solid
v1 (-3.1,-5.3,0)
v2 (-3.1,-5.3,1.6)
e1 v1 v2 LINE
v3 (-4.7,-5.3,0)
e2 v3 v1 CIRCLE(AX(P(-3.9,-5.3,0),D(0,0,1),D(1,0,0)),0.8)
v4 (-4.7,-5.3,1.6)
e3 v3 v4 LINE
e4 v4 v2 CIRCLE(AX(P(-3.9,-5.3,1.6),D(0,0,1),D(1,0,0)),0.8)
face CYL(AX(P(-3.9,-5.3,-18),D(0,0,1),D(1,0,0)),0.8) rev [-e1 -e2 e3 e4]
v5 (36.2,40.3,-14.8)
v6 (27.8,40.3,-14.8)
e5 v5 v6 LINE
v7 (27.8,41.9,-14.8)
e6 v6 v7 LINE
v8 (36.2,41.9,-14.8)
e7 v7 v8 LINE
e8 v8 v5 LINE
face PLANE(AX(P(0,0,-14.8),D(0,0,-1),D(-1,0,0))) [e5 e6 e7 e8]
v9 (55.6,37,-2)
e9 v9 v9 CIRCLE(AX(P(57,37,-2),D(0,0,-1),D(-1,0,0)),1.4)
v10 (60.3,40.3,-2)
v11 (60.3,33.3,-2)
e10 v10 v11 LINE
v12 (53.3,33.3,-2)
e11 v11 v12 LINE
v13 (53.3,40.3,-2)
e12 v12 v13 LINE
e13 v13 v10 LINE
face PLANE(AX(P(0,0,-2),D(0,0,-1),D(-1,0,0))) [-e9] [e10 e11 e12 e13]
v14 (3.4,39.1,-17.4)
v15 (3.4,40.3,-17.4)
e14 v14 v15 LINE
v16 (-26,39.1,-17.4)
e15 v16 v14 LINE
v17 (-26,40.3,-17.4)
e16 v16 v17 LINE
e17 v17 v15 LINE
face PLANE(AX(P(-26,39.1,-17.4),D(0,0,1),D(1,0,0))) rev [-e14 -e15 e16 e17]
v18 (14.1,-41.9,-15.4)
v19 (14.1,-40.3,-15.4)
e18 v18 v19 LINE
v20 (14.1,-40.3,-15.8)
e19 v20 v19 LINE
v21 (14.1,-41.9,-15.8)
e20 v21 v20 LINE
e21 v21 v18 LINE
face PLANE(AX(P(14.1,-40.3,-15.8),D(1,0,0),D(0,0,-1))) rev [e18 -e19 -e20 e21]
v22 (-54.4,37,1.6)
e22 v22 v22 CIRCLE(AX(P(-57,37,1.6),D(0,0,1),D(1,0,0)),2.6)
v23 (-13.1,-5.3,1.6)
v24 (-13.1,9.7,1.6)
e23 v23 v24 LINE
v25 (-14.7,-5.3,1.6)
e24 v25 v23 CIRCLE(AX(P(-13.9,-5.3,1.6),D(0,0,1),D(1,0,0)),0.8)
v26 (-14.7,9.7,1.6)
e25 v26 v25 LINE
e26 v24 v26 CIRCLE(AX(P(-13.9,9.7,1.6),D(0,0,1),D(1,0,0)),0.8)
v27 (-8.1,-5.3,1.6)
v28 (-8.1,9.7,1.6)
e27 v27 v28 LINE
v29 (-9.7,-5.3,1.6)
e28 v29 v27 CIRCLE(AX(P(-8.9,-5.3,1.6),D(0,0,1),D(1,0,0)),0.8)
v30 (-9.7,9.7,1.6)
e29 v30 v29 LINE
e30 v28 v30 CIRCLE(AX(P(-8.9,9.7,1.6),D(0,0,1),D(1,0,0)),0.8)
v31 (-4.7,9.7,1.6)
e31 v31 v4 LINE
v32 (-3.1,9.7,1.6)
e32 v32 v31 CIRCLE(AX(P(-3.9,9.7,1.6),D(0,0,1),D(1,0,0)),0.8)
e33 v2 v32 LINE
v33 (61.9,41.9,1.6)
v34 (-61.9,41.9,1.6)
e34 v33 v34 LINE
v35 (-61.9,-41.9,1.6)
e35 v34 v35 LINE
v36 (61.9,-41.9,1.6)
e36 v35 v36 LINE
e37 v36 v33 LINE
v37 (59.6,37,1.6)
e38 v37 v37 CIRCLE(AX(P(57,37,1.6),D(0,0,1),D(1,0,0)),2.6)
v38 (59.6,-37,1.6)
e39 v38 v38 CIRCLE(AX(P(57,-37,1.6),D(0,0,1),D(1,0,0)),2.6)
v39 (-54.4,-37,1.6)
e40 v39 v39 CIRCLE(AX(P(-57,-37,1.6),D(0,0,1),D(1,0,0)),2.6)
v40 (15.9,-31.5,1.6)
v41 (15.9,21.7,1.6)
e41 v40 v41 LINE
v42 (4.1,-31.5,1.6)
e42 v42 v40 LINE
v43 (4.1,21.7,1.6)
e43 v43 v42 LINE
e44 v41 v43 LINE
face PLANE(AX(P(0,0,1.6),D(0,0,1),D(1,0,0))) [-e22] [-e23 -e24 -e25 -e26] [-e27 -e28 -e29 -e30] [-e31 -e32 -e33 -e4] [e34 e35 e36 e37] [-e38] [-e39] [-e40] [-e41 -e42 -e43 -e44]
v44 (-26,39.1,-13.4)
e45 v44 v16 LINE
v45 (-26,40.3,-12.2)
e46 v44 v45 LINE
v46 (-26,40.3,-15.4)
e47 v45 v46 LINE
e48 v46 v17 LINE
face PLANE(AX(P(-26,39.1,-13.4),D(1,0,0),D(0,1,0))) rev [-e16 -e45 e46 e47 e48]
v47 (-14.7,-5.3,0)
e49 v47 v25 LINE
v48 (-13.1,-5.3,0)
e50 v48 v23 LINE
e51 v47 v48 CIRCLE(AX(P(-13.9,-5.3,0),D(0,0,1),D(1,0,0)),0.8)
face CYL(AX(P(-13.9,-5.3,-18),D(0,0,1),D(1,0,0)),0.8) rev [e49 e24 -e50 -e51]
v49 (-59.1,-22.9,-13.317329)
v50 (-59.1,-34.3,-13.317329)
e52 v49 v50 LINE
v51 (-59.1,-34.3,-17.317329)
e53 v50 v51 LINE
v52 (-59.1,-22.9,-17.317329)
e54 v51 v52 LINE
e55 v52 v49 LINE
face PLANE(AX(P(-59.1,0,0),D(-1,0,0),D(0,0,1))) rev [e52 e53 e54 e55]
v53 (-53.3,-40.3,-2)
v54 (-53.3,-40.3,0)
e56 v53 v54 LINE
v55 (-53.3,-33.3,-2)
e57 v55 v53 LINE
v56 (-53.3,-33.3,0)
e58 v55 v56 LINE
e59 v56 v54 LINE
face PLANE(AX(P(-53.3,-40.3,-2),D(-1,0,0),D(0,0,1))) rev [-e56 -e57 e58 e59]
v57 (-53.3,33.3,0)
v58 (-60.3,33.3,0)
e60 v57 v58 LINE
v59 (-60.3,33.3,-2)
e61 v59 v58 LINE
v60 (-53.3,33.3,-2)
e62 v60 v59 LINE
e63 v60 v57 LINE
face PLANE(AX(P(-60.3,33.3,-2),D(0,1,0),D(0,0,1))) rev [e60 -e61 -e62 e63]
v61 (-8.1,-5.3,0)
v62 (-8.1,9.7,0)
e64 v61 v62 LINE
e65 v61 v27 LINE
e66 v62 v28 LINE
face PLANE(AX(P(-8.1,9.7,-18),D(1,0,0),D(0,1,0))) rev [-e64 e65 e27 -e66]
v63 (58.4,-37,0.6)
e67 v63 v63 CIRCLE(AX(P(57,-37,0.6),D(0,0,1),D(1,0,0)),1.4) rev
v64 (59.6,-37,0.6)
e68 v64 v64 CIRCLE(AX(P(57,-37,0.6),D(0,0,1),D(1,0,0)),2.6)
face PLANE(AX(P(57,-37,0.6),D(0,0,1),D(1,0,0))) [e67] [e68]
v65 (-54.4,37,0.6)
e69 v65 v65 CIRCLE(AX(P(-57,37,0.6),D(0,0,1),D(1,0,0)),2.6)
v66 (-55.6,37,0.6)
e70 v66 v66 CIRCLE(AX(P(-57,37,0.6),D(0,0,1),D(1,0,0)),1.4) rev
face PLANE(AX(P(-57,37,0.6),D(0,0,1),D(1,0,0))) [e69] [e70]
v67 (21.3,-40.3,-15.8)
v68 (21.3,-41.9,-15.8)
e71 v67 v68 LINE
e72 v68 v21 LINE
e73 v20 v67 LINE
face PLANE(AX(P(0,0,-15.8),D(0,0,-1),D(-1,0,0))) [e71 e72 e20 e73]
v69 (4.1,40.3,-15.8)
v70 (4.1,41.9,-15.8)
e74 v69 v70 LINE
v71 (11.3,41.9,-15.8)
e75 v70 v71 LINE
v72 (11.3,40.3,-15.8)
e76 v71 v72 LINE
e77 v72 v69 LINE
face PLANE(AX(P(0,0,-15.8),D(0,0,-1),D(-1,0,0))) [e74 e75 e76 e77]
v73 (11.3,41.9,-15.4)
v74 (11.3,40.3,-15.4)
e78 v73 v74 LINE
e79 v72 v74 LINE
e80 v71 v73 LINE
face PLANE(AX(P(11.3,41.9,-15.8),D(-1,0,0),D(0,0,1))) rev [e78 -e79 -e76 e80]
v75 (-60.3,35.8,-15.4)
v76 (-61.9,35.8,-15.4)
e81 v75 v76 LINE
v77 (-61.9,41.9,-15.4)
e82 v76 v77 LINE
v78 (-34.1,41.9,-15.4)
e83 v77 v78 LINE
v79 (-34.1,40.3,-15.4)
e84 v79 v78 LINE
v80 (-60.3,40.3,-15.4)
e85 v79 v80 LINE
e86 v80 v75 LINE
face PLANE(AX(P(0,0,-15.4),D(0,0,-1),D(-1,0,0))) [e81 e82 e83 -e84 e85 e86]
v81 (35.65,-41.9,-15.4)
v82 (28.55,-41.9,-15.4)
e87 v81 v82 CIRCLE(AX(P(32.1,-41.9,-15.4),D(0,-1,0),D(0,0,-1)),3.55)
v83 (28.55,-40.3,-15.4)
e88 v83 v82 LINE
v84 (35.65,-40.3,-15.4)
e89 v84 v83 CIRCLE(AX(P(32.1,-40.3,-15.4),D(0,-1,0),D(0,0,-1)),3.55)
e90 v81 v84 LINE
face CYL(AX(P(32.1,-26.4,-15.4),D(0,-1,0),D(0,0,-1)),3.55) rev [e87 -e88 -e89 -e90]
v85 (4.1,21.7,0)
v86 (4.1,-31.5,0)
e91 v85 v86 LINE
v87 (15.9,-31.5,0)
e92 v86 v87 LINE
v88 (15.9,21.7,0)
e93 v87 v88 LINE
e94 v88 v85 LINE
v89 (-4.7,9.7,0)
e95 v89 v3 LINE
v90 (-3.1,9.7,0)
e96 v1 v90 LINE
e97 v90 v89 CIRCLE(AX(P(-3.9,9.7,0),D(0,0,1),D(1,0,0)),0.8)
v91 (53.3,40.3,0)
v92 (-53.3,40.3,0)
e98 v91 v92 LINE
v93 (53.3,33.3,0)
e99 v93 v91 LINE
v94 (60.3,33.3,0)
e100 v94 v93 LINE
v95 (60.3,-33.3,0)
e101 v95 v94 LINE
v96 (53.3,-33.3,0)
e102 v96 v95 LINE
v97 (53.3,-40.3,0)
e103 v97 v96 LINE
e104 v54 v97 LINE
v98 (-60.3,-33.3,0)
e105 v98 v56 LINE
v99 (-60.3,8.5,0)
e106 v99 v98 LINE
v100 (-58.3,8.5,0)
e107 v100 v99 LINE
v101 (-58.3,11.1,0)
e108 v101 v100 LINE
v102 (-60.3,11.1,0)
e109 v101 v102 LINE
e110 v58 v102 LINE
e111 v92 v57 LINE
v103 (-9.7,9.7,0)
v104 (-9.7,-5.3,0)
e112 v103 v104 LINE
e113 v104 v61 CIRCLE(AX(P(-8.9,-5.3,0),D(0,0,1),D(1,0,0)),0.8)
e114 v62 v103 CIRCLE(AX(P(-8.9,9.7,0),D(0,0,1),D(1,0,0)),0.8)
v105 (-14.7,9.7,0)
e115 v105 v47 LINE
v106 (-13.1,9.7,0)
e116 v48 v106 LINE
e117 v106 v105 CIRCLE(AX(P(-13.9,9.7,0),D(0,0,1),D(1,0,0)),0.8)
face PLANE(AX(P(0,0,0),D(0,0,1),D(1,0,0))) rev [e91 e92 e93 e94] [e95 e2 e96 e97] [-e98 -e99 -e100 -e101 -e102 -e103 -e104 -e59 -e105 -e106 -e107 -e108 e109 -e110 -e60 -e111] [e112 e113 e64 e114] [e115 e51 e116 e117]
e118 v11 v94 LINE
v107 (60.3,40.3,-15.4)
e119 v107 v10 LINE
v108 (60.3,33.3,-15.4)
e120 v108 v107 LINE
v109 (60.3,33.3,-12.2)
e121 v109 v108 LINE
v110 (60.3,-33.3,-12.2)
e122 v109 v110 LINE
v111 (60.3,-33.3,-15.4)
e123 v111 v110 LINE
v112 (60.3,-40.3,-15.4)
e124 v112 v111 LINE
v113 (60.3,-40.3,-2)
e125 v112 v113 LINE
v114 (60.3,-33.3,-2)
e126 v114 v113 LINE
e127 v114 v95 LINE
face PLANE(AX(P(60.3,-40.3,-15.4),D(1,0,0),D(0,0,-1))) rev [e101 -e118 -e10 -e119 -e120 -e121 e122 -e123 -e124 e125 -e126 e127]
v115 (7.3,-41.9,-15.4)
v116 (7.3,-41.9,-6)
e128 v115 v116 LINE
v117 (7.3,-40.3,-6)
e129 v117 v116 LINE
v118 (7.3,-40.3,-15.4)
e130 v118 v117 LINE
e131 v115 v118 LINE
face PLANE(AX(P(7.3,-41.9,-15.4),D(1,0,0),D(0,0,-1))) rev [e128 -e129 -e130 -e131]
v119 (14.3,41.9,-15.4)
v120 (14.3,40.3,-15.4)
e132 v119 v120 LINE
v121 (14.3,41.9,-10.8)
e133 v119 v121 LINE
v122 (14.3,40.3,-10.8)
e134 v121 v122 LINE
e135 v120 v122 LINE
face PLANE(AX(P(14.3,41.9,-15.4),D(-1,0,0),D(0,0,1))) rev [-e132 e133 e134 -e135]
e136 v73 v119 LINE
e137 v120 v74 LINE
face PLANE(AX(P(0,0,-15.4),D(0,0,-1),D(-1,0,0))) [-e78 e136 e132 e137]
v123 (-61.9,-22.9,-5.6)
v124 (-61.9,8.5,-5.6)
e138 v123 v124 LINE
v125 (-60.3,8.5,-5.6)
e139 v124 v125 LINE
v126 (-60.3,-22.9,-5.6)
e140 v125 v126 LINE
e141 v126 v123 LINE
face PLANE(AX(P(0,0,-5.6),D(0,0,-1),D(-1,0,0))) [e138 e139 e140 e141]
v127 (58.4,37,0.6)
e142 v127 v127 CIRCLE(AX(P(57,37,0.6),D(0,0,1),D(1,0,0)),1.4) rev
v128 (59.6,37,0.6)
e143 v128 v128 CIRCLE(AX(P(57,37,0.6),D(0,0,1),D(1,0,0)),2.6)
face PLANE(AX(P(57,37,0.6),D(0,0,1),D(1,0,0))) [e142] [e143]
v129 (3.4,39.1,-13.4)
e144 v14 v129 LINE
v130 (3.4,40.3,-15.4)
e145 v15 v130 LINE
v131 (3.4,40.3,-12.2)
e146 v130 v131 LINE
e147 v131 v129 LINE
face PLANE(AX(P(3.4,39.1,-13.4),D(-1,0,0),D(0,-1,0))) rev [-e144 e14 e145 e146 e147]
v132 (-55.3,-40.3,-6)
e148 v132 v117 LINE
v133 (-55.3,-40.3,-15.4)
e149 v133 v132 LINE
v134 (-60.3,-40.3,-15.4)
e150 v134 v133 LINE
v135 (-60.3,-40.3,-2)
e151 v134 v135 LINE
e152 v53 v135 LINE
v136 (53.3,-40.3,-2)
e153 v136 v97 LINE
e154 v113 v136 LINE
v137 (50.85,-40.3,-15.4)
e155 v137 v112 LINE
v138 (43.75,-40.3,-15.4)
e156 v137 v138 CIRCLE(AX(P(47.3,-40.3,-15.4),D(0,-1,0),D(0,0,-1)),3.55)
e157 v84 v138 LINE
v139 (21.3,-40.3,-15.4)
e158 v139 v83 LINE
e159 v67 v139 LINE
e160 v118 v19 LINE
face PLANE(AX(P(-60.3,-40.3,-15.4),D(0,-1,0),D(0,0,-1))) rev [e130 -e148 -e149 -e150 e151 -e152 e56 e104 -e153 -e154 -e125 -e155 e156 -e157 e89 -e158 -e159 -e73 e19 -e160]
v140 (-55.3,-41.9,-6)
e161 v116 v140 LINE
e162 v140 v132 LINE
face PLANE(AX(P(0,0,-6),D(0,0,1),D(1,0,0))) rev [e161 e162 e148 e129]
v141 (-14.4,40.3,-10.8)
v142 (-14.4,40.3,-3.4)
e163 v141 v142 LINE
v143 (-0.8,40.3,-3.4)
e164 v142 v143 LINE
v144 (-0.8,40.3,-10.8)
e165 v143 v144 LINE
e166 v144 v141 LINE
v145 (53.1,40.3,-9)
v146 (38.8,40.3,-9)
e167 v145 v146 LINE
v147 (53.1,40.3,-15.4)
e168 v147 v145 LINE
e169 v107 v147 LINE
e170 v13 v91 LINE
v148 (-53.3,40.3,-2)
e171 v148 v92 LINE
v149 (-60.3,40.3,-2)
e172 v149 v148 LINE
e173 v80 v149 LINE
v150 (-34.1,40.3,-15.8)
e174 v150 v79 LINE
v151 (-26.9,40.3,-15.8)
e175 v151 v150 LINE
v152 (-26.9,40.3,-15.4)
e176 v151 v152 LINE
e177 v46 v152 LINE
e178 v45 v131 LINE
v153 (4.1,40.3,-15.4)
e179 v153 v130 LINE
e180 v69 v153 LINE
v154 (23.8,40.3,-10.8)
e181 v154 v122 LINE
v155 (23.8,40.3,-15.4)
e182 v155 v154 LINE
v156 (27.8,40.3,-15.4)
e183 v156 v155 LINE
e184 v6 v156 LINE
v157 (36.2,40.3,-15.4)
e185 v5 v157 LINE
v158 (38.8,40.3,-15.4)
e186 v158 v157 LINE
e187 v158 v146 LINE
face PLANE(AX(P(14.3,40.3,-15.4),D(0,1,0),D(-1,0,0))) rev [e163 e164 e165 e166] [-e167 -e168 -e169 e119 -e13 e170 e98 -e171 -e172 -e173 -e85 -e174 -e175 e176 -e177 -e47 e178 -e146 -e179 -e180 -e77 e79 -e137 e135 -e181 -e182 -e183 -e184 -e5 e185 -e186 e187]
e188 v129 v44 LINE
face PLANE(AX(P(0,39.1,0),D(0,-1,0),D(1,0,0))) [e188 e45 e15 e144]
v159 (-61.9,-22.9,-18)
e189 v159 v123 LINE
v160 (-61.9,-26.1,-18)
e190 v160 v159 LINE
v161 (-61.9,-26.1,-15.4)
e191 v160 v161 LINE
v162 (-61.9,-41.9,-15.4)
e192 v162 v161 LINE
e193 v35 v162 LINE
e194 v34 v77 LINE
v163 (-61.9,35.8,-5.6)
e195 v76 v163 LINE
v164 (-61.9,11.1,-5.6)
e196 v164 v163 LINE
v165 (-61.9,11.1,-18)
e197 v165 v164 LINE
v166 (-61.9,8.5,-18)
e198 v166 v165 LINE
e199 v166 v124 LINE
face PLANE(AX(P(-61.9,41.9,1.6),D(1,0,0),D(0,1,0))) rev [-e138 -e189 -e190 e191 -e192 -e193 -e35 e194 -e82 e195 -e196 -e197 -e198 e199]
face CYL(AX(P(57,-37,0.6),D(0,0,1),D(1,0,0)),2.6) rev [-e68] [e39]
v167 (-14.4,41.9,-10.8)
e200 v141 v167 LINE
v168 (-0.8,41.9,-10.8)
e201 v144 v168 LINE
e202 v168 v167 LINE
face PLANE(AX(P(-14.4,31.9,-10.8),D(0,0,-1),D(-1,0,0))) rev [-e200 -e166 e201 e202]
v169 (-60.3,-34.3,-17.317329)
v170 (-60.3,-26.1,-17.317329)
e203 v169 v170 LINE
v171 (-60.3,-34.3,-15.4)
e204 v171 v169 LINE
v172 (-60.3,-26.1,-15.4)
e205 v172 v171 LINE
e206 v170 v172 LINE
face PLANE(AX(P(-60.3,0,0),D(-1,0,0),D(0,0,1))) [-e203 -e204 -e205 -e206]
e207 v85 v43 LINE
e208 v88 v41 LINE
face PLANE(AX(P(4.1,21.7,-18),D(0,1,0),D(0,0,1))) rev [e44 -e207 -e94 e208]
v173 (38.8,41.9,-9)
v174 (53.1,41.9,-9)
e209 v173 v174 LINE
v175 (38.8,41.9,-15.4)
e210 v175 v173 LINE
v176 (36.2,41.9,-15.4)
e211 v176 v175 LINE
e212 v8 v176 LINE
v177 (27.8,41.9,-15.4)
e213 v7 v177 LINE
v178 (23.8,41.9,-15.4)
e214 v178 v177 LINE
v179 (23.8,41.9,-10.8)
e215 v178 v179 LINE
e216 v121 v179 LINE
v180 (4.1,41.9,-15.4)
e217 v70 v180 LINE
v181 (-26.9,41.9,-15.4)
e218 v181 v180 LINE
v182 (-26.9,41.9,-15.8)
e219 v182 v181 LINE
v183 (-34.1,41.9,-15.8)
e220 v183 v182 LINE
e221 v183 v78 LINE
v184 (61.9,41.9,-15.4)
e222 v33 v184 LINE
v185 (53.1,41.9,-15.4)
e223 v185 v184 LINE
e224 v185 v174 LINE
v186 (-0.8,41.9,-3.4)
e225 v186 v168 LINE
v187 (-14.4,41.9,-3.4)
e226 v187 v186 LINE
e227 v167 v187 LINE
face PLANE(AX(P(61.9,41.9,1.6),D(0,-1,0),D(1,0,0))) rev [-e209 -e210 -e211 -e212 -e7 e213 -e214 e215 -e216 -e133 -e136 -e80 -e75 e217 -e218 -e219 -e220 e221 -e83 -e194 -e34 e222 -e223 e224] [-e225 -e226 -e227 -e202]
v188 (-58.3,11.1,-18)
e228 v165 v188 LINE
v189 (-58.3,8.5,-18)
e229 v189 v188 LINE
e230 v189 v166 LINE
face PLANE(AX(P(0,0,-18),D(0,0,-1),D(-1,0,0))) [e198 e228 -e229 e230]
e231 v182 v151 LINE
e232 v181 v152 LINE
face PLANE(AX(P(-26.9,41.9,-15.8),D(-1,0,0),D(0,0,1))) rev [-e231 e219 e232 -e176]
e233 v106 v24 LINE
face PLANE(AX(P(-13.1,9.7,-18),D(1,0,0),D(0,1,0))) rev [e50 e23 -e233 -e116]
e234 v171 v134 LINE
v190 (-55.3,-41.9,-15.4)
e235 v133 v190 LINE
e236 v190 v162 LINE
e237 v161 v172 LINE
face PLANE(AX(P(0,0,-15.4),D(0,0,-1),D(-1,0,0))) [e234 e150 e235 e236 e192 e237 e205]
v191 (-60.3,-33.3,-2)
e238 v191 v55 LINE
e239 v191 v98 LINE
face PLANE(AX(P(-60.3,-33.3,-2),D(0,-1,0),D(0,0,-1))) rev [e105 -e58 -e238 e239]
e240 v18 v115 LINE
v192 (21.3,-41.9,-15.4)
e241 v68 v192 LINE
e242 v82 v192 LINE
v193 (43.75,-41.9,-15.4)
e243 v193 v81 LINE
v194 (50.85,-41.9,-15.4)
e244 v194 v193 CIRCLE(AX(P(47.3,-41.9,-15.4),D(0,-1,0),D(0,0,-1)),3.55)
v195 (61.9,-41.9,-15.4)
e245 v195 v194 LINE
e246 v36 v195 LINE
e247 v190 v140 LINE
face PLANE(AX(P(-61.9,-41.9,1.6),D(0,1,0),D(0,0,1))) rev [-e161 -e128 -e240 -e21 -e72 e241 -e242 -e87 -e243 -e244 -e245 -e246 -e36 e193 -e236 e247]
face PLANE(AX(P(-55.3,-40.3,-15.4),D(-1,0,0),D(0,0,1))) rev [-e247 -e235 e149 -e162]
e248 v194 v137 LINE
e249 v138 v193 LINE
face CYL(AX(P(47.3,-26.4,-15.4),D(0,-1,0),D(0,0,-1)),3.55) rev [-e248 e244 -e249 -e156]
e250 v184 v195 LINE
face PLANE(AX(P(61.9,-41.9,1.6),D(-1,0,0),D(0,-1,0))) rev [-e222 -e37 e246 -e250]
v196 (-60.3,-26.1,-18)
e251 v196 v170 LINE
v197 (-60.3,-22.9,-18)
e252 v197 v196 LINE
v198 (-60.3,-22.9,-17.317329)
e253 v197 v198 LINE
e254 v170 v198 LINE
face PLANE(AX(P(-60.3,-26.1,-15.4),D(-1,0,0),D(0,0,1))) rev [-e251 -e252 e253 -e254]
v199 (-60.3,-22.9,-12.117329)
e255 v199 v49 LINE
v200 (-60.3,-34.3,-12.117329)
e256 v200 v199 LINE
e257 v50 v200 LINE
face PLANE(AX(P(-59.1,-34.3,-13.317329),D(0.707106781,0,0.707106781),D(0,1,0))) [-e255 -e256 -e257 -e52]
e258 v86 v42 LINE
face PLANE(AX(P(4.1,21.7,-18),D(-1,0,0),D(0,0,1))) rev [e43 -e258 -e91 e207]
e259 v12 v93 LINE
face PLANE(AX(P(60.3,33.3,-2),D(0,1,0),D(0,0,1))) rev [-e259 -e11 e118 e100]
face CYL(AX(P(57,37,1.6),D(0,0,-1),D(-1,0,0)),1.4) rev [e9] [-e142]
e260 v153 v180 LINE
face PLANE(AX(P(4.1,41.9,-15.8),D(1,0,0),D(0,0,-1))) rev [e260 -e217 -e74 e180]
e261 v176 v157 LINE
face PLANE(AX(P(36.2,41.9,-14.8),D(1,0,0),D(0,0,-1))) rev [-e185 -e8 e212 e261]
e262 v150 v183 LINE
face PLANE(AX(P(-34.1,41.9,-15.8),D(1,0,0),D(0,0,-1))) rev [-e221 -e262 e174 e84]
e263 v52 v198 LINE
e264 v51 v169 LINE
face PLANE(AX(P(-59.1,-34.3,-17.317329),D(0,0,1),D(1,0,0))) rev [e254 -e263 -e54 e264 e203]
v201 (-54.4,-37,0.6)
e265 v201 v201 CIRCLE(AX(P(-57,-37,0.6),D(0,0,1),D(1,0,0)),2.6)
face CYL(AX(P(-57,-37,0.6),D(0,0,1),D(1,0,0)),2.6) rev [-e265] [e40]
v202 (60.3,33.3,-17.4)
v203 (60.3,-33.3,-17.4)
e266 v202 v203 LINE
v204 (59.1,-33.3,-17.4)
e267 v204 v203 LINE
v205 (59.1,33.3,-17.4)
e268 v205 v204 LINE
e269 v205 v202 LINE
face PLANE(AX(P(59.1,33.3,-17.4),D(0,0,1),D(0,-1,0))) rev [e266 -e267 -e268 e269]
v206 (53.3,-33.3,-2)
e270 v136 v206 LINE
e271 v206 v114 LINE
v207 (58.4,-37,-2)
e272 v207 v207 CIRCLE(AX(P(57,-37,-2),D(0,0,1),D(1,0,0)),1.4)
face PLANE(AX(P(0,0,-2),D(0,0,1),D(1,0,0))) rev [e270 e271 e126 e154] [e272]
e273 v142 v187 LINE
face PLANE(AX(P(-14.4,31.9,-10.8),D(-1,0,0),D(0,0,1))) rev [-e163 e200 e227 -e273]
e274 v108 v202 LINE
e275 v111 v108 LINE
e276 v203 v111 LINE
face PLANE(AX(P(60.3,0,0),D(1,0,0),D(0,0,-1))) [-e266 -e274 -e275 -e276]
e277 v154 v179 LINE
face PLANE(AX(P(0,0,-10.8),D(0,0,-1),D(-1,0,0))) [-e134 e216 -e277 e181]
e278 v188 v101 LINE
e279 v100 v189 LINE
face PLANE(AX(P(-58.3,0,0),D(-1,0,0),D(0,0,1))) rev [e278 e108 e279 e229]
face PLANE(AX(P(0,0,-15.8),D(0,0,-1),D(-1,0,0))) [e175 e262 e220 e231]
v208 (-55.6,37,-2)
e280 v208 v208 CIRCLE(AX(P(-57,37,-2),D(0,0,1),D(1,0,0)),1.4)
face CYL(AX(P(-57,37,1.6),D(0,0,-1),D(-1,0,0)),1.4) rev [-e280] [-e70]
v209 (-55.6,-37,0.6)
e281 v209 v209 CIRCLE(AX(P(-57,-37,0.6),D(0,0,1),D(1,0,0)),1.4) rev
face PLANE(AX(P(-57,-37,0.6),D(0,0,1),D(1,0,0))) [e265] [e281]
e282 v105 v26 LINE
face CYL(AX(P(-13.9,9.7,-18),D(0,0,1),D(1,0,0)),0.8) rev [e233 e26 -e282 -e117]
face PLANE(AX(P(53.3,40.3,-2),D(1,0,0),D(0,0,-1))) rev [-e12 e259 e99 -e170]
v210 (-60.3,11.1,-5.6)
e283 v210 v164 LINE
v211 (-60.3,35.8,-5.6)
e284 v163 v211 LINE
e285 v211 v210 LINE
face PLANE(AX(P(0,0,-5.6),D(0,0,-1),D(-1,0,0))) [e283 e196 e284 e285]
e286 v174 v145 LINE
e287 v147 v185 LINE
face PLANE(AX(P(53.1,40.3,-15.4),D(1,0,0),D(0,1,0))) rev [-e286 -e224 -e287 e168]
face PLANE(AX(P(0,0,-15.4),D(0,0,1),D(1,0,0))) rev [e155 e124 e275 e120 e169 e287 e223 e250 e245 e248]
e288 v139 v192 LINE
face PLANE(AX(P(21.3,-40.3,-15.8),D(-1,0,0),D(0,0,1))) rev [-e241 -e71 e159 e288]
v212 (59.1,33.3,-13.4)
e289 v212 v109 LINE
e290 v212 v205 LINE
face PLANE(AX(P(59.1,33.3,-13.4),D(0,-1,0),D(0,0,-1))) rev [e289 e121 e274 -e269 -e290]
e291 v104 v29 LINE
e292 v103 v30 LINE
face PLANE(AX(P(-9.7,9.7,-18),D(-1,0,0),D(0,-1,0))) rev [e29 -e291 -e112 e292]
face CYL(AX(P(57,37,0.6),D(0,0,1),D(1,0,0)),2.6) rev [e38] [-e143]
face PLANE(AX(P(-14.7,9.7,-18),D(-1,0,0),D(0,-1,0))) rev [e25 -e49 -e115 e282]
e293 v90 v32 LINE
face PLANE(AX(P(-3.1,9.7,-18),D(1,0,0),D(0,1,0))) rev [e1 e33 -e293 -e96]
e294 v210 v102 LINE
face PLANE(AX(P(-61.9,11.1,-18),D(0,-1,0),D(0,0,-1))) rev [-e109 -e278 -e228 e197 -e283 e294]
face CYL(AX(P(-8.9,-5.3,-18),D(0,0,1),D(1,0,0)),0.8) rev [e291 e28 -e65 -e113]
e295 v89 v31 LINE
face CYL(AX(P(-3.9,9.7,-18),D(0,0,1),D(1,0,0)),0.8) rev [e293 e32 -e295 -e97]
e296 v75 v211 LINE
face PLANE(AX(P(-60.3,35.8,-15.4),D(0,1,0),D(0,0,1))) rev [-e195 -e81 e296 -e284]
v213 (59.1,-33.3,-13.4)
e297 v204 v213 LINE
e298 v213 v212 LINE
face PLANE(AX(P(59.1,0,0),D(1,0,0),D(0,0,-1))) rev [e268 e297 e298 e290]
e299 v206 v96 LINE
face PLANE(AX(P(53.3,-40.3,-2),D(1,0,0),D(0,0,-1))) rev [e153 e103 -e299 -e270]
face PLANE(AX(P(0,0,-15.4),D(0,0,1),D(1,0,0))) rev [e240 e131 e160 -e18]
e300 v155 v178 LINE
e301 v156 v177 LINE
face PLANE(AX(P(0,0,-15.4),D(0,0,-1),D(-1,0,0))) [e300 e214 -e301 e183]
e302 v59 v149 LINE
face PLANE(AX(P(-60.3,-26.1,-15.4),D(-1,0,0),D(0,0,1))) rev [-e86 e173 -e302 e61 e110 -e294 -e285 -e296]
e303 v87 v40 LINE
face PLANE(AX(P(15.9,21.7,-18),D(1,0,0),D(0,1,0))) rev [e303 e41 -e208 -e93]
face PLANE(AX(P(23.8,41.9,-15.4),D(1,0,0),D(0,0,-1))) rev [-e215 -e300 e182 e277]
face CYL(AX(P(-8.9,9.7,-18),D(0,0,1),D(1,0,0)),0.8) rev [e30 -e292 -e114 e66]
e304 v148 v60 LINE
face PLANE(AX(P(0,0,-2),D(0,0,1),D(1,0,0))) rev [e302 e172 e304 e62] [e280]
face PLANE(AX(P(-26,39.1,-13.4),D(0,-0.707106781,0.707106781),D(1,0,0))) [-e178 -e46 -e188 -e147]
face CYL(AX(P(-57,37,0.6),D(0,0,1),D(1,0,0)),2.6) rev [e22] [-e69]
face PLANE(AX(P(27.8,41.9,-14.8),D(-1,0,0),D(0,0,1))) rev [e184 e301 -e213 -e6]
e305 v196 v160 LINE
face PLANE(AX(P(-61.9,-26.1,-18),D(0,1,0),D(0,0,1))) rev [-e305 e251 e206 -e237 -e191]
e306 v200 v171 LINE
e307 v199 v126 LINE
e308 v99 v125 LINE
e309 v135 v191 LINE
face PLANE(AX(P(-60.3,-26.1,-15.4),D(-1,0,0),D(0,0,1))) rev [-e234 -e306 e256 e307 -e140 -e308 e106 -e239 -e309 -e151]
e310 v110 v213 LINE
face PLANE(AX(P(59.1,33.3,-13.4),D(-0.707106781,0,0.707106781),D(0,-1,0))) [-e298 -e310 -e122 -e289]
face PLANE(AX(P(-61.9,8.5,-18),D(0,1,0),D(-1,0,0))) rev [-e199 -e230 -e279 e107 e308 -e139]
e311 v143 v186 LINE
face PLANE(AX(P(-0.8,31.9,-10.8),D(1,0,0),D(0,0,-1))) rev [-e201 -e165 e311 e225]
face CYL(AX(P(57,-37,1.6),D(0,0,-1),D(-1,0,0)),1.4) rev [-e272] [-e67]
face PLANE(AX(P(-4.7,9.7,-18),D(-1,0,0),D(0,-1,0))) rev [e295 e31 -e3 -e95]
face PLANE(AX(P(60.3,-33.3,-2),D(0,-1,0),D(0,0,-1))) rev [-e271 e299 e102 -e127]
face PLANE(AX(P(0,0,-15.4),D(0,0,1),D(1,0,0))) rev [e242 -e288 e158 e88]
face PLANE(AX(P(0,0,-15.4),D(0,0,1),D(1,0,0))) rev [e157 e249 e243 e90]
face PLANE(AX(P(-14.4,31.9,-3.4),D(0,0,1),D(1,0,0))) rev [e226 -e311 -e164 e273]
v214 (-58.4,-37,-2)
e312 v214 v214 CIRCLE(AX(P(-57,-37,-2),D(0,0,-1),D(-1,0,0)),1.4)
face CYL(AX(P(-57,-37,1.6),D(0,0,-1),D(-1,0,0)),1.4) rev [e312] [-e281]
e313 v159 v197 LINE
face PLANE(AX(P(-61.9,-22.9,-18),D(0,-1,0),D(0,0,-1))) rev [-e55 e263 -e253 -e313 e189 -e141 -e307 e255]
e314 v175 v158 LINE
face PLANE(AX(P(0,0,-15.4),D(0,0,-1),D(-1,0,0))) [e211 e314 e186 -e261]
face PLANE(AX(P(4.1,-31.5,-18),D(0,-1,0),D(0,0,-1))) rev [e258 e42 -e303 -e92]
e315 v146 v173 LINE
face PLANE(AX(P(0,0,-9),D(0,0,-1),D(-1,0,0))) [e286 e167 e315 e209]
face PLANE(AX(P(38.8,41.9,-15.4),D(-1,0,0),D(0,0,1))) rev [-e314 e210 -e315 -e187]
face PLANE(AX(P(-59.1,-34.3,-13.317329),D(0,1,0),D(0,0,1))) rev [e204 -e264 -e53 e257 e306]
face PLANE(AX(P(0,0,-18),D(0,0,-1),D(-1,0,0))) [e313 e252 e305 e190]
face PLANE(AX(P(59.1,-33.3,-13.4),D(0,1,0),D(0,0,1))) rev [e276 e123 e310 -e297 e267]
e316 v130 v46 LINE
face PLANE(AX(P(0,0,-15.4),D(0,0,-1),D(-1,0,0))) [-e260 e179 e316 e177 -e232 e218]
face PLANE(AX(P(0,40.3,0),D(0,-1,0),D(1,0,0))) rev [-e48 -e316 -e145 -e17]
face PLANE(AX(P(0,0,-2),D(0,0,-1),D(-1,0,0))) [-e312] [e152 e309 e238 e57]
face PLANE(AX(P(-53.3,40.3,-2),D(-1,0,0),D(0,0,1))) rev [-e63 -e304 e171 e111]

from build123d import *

# Parameters (mm, degrees)
SKETCH1_W               = 120.6
SKETCH1_H               = 80.6
BOSS_EXTRUDE1_DEPTH     = 1.6
SKETCH2_W               = 123.8
SKETCH2_H               = 83.8
BOSS_EXTRUDE2_DEPTH     = 1.6
SKETCH15_W              = 54.6
SKETCH15_H              = 1.6
BOSS_EXTRUDE10_DEPTH    = 15.4
SKETCH16_R              = 3.55
CUT_EXTRUDE5_DEPTH      = 15.5
BOSS_EXTRUDE11_DEPTH    = 15.4
SKETCH18_W              = 1.6
SKETCH18_H              = 3.2
SKETCH18_H_2            = 2.6
BOSS_EXTRUDE12_DEPTH    = 18
BOSS_EXTRUDE13_DEPTH    = 15.4
SKETCH20_W              = 15
SKETCH20_H              = 1.6
BOSS_EXTRUDE14_DEPTH    = 15.4
BOSS_EXTRUDE15_DEPTH    = 15.4
SKETCH22_W              = 62.6
SKETCH22_H              = 1.6
BOSS_EXTRUDE16_DEPTH    = 6
SKETCH23_W              = 1.6
SKETCH23_H              = 31.4
BOSS_EXTRUDE17_DEPTH    = 5.6
SKETCH24_W              = 1.6
SKETCH24_H              = 24.7
BOSS_EXTRUDE18_DEPTH    = 5.6
SKETCH25_W              = 11.5
SKETCH25_H              = 1.6
BOSS_EXTRUDE19_DEPTH    = 10.8
SKETCH26_W              = 14.3
SKETCH26_H              = 1.6
BOSS_EXTRUDE20_DEPTH    = 9
SKETCH27_W              = 8.4
SKETCH27_H              = 1.6
CUT_EXTRUDE6_DEPTH      = 0.6
SKETCH29_W              = 7
SKETCH29_H              = 7
BOSS_EXTRUDE21_DEPTH    = 2
CUT_EXTRUDE8_DEPTH      = 77.884458768
CUT_EXTRUDE8_DEPTH_BACK = 77.884458768
SKETCH28_R              = 1.4
SKETCH30_R              = 2.6
CUT_EXTRUDE9_DEPTH      = 1
SKETCH31_W              = 11.8
SKETCH31_H              = 53.2
CUT_EXTRUDE11_DEPTH     = 78.274704788
SKETCH32_W              = 13.6
SKETCH32_H              = 7.4
CUT_EXTRUDE12_DEPTH     = 10
SKETCH34_W              = 7.2
SKETCH34_H              = 1.6
BOSS_EXTRUDE22_DEPTH    = 0.4
SKETCH35_W              = 7.2
SKETCH35_H              = 1.6
BOSS_EXTRUDE23_DEPTH    = 0.4
SKETCH36_W              = 4
SKETCH36_H              = 66.6
BOSS_EXTRUDE25_DEPTH    = 1.2
SKETCH37_W              = 4
SKETCH37_H              = 11.4
BOSS_EXTRUDE31_DEPTH    = 1.2
SKETCH37_2_W            = 4
SKETCH37_2_H            = 11.4
BOSS_EXTRUDE36_DEPTH    = 1.2
SKETCH37_3_W            = 4
SKETCH37_3_H            = 11.4
BOSS_EXTRUDE37_DEPTH    = 1.2
SKETCH38_W              = 29.4
SKETCH38_H              = 4
BOSS_EXTRUDE40_DEPTH    = 1.2
CHAMFER1_SIZE           = 1.2
SKETCH39_W              = 18
SKETCH39_H              = 2.6
BOSS_EXTRUDE41_DEPTH    = 2


with BuildPart() as part:
    # Sketch1 → Boss-Extrude1 (new body)
    with BuildSketch(Plane.XY):
        Rectangle(SKETCH1_W, SKETCH1_H)
    extrude(amount=BOSS_EXTRUDE1_DEPTH)

    # Sketch2 → Boss-Extrude2 (add)
    with BuildSketch(Plane.XY):
        Rectangle(SKETCH2_W, SKETCH2_H)
    extrude(amount=BOSS_EXTRUDE2_DEPTH)

    # Sketch15 → Boss-Extrude10 (add)
    with BuildSketch(Plane(origin=(0, 0, 0), x_dir=(-1, 0, 0), z_dir=(0, 0, -1))):
        with Locations((-34.6, -41.1)):
            Rectangle(SKETCH15_W, SKETCH15_H)
    extrude(amount=BOSS_EXTRUDE10_DEPTH)

    # Sketch16 → Cut-Extrude5 (cut)
    with BuildSketch(Plane.XZ.offset(41.9)):
        with Locations((47.3, -15.4)):
            Circle(SKETCH16_R)
        with Locations((32.1, -15.4)):
            Circle(SKETCH16_R)
    extrude(amount=-CUT_EXTRUDE5_DEPTH, mode=Mode.SUBTRACT)

    # Sketch17 → Boss-Extrude11 (add)
    with BuildSketch(Plane(origin=(0, 0, 0), x_dir=(-1, 0, 0), z_dir=(0, 0, -1))):
        Polygon((55.3, -41.9), (61.9, -41.9), (61.9, -26.1), (60.3, -26.1), (60.3, -40.3), (55.3, -40.3), align=None)
    extrude(amount=BOSS_EXTRUDE11_DEPTH)

    # Sketch18 → Boss-Extrude12 (add)
    with BuildSketch(Plane(origin=(0, 0, 0), x_dir=(-1, 0, 0), z_dir=(0, 0, -1))):
        with Locations((61.1, -24.5)):
            Rectangle(SKETCH18_W, SKETCH18_H)
        with Locations((61.1, 9.8)):
            Rectangle(SKETCH18_W, SKETCH18_H_2)
    extrude(amount=BOSS_EXTRUDE12_DEPTH)

    # Sketch19 → Boss-Extrude13 (add)
    with BuildSketch(Plane(origin=(0, 0, 0), x_dir=(-1, 0, 0), z_dir=(0, 0, -1))):
        Polygon((60.3, 35.8), (61.9, 35.8), (61.9, 41.9), (-14.3, 41.9), (-14.3, 40.3), (60.3, 40.3), align=None)
    extrude(amount=BOSS_EXTRUDE13_DEPTH)

    # Sketch20 → Boss-Extrude14 (add)
    with BuildSketch(Plane(origin=(0, 0, 0), x_dir=(-1, 0, 0), z_dir=(0, 0, -1))):
        with Locations((-31.3, 41.1)):
            Rectangle(SKETCH20_W, SKETCH20_H)
    extrude(amount=BOSS_EXTRUDE14_DEPTH)

    # Sketch21 → Boss-Extrude15 (add)
    with BuildSketch(Plane(origin=(0, 0, 0), x_dir=(-1, 0, 0), z_dir=(0, 0, -1))):
        Polygon((-53.1, 40.3), (-53.1, 41.9), (-61.9, 41.9), (-61.9, -40.3), (-60.3, -40.3), (-60.3, 40.3), align=None)
    extrude(amount=BOSS_EXTRUDE15_DEPTH)

    # Sketch22 → Boss-Extrude16 (add)
    with BuildSketch(Plane(origin=(0, 0, 0), x_dir=(-1, 0, 0), z_dir=(0, 0, -1))):
        with Locations((24, -41.1)):
            Rectangle(SKETCH22_W, SKETCH22_H)
    extrude(amount=BOSS_EXTRUDE16_DEPTH)

    # Sketch23 → Boss-Extrude17 (add)
    with BuildSketch(Plane(origin=(0, 0, 0), x_dir=(-1, 0, 0), z_dir=(0, 0, -1))):
        with Locations((61.1, -7.2)):
            Rectangle(SKETCH23_W, SKETCH23_H)
    extrude(amount=BOSS_EXTRUDE17_DEPTH)

    # Sketch24 → Boss-Extrude18 (add)
    with BuildSketch(Plane(origin=(0, 0, 0), x_dir=(-1, 0, 0), z_dir=(0, 0, -1))):
        with Locations((61.1, 23.45)):
            Rectangle(SKETCH24_W, SKETCH24_H)
    extrude(amount=BOSS_EXTRUDE18_DEPTH)

    # Sketch25 → Boss-Extrude19 (add)
    with BuildSketch(Plane(origin=(0, 0, 0), x_dir=(-1, 0, 0), z_dir=(0, 0, -1))):
        with Locations((-19.65, 41.1)):
            Rectangle(SKETCH25_W, SKETCH25_H)
    extrude(amount=BOSS_EXTRUDE19_DEPTH)

    # Sketch26 → Boss-Extrude20 (add)
    with BuildSketch(Plane(origin=(0, 0, 0), x_dir=(-1, 0, 0), z_dir=(0, 0, -1))):
        with Locations((-45.95, 41.1)):
            Rectangle(SKETCH26_W, SKETCH26_H)
    extrude(amount=BOSS_EXTRUDE20_DEPTH)

    # Sketch27 → Cut-Extrude6 (cut)
    with BuildSketch(Plane(origin=(0, 0, -15.4), x_dir=(-1, 0, 0), z_dir=(0, 0, -1))):
        with Locations((-32, 41.1)):
            Rectangle(SKETCH27_W, SKETCH27_H)
    extrude(amount=-CUT_EXTRUDE6_DEPTH, mode=Mode.SUBTRACT)

    # Sketch29 → Boss-Extrude21 (add)
    with BuildSketch(Plane(origin=(0, 0, 0), x_dir=(-1, 0, 0), z_dir=(0, 0, -1))):
        with Locations((-56.8, -36.8)):
            Rectangle(SKETCH29_W, SKETCH29_H)
        with Locations((-56.8, 36.8)):
            Rectangle(SKETCH29_W, SKETCH29_H)
        with Locations((56.8, 36.8)):
            Rectangle(SKETCH29_W, SKETCH29_H)
        with Locations((56.8, -36.8)):
            Rectangle(SKETCH29_W, SKETCH29_H)
    extrude(amount=BOSS_EXTRUDE21_DEPTH)

    # Sketch28 → Cut-Extrude8 (cut, two sides: drawn at the far end of the back side and taken through both)
    with BuildSketch(Plane(origin=(0, 0, 0), x_dir=(-1, 0, 0), z_dir=(0, 0, -1)).offset(-CUT_EXTRUDE8_DEPTH_BACK)):
        with Locations((-57, 37)):
            Circle(SKETCH28_R)
        with Locations((57, 37)):
            Circle(SKETCH28_R)
        with Locations((57, -37)):
            Circle(SKETCH28_R)
        with Locations((-57, -37)):
            Circle(SKETCH28_R)
    extrude(amount=CUT_EXTRUDE8_DEPTH + CUT_EXTRUDE8_DEPTH_BACK, mode=Mode.SUBTRACT)

    # Sketch30 → Cut-Extrude9 (cut)
    with BuildSketch(Plane.XY.offset(1.6)):
        with Locations((-57, 37)):
            Circle(SKETCH30_R)
        with Locations((57, 37)):
            Circle(SKETCH30_R)
        with Locations((57, -37)):
            Circle(SKETCH30_R)
        with Locations((-57, -37)):
            Circle(SKETCH30_R)
    extrude(amount=-CUT_EXTRUDE9_DEPTH, mode=Mode.SUBTRACT)

    # Sketch31 → Cut-Extrude11 (cut, through all)
    with BuildSketch(Plane.XY.offset(1.6)):
        with Locations((10, -4.9)):
            Rectangle(SKETCH31_W, SKETCH31_H)
        with BuildLine():
            Line((-8.1, 9.7), (-8.1, -5.3))
            ThreePointArc((-8.1, -5.3), (-8.9, -6.1), (-9.7, -5.3))
            Line((-9.7, -5.3), (-9.7, 9.7))
            ThreePointArc((-9.7, 9.7), (-8.9, 10.5), (-8.1, 9.7))
        make_face()
        with BuildLine():
            Line((-13.1, 9.7), (-13.1, -5.3))
            ThreePointArc((-13.1, -5.3), (-13.9, -6.1), (-14.7, -5.3))
            Line((-14.7, -5.3), (-14.7, 9.7))
            ThreePointArc((-14.7, 9.7), (-13.9, 10.5), (-13.1, 9.7))
        make_face()
        with BuildLine():
            Line((-3.1, 9.7), (-3.1, -5.3))
            ThreePointArc((-3.1, -5.3), (-3.9, -6.1), (-4.7, -5.3))
            Line((-4.7, -5.3), (-4.7, 9.7))
            ThreePointArc((-4.7, 9.7), (-3.9, 10.5), (-3.1, 9.7))
        make_face()
    extrude(amount=-CUT_EXTRUDE11_DEPTH, mode=Mode.SUBTRACT)

    # Sketch32 → Cut-Extrude12 (cut)
    with BuildSketch(Plane(origin=(0, 41.9, 0), x_dir=(1, 0, 0), z_dir=(0, 1, 0))):
        with Locations((-7.6, 7.1)):
            Rectangle(SKETCH32_W, SKETCH32_H)
    extrude(amount=-CUT_EXTRUDE12_DEPTH, mode=Mode.SUBTRACT)

    # Sketch34 → Boss-Extrude22 (add)
    with BuildSketch(Plane(origin=(0, 0, -15.4), x_dir=(-1, 0, 0), z_dir=(0, 0, -1))):
        with Locations((-7.7, 41.1)):
            Rectangle(SKETCH34_W, SKETCH34_H)
        with Locations((30.5, 41.1)):
            Rectangle(SKETCH34_W, SKETCH34_H)
    extrude(amount=BOSS_EXTRUDE22_DEPTH)

    # Sketch35 → Boss-Extrude23 (add)
    with BuildSketch(Plane(origin=(0, 0, -15.4), x_dir=(-1, 0, 0), z_dir=(0, 0, -1))):
        with Locations((-17.7, -41.1)):
            Rectangle(SKETCH35_W, SKETCH35_H)
    extrude(amount=BOSS_EXTRUDE23_DEPTH)

    # Sketch36 → Boss-Extrude25 (add)
    with BuildSketch(Plane.ZY.offset(-60.3)):
        with Locations((-15.4, 0)):
            Rectangle(SKETCH36_W, SKETCH36_H)
    extrude(amount=BOSS_EXTRUDE25_DEPTH)

    # Sketch37 → Boss-Extrude31 (add)
    with BuildSketch(Plane(origin=(-60.3, 0, 0), x_dir=(0, 0, -1), z_dir=(1, 0, 0))):
        with Locations((15.317328584, -28.6)):
            Rectangle(SKETCH37_W, SKETCH37_H)
    extrude(amount=BOSS_EXTRUDE31_DEPTH)

    # Sketch37<2> → Boss-Extrude36 (add)
    with BuildSketch(Plane(origin=(-60.3, 0, 0), x_dir=(0, 0, -1), z_dir=(1, 0, 0))):
        with Locations((15.317328584, -28.6)):
            Rectangle(SKETCH37_2_W, SKETCH37_2_H)
    extrude(amount=BOSS_EXTRUDE36_DEPTH)

    # Sketch37<3> → Boss-Extrude37 (add)
    with BuildSketch(Plane(origin=(-60.3, 0, 0), x_dir=(0, 0, -1), z_dir=(1, 0, 0))):
        with Locations((15.317328584, -28.6)):
            Rectangle(SKETCH37_3_W, SKETCH37_3_H)
    extrude(amount=BOSS_EXTRUDE37_DEPTH)

    # Sketch38 → Boss-Extrude40 (add)
    with BuildSketch(Plane.XZ.offset(-40.3)):
        with Locations((-11.3, -15.4)):
            Rectangle(SKETCH38_W, SKETCH38_H)
    extrude(amount=BOSS_EXTRUDE40_DEPTH)

    # Chamfer1
    chamfer1_edges = [part.edges().sort_by_distance(p)[0] for p in [
        (60.3, 0, -13.4),
        (-60.3, -28.6, -13.317328584),
        (-11.3, 40.3, -13.4),
    ]]
    chamfer(chamfer1_edges, length=CHAMFER1_SIZE - 0.0001)  # a hair under: the kernel refuses the full size

    # Sketch39 → Boss-Extrude41 (add)
    with BuildSketch(Plane(origin=(-60.3, 0, 0), x_dir=(0, 0, -1), z_dir=(1, 0, 0))):
        with Locations((9, 9.8)):
            Rectangle(SKETCH39_W, SKETCH39_H)
    extrude(amount=BOSS_EXTRUDE41_DEPTH)


solid = part.part
